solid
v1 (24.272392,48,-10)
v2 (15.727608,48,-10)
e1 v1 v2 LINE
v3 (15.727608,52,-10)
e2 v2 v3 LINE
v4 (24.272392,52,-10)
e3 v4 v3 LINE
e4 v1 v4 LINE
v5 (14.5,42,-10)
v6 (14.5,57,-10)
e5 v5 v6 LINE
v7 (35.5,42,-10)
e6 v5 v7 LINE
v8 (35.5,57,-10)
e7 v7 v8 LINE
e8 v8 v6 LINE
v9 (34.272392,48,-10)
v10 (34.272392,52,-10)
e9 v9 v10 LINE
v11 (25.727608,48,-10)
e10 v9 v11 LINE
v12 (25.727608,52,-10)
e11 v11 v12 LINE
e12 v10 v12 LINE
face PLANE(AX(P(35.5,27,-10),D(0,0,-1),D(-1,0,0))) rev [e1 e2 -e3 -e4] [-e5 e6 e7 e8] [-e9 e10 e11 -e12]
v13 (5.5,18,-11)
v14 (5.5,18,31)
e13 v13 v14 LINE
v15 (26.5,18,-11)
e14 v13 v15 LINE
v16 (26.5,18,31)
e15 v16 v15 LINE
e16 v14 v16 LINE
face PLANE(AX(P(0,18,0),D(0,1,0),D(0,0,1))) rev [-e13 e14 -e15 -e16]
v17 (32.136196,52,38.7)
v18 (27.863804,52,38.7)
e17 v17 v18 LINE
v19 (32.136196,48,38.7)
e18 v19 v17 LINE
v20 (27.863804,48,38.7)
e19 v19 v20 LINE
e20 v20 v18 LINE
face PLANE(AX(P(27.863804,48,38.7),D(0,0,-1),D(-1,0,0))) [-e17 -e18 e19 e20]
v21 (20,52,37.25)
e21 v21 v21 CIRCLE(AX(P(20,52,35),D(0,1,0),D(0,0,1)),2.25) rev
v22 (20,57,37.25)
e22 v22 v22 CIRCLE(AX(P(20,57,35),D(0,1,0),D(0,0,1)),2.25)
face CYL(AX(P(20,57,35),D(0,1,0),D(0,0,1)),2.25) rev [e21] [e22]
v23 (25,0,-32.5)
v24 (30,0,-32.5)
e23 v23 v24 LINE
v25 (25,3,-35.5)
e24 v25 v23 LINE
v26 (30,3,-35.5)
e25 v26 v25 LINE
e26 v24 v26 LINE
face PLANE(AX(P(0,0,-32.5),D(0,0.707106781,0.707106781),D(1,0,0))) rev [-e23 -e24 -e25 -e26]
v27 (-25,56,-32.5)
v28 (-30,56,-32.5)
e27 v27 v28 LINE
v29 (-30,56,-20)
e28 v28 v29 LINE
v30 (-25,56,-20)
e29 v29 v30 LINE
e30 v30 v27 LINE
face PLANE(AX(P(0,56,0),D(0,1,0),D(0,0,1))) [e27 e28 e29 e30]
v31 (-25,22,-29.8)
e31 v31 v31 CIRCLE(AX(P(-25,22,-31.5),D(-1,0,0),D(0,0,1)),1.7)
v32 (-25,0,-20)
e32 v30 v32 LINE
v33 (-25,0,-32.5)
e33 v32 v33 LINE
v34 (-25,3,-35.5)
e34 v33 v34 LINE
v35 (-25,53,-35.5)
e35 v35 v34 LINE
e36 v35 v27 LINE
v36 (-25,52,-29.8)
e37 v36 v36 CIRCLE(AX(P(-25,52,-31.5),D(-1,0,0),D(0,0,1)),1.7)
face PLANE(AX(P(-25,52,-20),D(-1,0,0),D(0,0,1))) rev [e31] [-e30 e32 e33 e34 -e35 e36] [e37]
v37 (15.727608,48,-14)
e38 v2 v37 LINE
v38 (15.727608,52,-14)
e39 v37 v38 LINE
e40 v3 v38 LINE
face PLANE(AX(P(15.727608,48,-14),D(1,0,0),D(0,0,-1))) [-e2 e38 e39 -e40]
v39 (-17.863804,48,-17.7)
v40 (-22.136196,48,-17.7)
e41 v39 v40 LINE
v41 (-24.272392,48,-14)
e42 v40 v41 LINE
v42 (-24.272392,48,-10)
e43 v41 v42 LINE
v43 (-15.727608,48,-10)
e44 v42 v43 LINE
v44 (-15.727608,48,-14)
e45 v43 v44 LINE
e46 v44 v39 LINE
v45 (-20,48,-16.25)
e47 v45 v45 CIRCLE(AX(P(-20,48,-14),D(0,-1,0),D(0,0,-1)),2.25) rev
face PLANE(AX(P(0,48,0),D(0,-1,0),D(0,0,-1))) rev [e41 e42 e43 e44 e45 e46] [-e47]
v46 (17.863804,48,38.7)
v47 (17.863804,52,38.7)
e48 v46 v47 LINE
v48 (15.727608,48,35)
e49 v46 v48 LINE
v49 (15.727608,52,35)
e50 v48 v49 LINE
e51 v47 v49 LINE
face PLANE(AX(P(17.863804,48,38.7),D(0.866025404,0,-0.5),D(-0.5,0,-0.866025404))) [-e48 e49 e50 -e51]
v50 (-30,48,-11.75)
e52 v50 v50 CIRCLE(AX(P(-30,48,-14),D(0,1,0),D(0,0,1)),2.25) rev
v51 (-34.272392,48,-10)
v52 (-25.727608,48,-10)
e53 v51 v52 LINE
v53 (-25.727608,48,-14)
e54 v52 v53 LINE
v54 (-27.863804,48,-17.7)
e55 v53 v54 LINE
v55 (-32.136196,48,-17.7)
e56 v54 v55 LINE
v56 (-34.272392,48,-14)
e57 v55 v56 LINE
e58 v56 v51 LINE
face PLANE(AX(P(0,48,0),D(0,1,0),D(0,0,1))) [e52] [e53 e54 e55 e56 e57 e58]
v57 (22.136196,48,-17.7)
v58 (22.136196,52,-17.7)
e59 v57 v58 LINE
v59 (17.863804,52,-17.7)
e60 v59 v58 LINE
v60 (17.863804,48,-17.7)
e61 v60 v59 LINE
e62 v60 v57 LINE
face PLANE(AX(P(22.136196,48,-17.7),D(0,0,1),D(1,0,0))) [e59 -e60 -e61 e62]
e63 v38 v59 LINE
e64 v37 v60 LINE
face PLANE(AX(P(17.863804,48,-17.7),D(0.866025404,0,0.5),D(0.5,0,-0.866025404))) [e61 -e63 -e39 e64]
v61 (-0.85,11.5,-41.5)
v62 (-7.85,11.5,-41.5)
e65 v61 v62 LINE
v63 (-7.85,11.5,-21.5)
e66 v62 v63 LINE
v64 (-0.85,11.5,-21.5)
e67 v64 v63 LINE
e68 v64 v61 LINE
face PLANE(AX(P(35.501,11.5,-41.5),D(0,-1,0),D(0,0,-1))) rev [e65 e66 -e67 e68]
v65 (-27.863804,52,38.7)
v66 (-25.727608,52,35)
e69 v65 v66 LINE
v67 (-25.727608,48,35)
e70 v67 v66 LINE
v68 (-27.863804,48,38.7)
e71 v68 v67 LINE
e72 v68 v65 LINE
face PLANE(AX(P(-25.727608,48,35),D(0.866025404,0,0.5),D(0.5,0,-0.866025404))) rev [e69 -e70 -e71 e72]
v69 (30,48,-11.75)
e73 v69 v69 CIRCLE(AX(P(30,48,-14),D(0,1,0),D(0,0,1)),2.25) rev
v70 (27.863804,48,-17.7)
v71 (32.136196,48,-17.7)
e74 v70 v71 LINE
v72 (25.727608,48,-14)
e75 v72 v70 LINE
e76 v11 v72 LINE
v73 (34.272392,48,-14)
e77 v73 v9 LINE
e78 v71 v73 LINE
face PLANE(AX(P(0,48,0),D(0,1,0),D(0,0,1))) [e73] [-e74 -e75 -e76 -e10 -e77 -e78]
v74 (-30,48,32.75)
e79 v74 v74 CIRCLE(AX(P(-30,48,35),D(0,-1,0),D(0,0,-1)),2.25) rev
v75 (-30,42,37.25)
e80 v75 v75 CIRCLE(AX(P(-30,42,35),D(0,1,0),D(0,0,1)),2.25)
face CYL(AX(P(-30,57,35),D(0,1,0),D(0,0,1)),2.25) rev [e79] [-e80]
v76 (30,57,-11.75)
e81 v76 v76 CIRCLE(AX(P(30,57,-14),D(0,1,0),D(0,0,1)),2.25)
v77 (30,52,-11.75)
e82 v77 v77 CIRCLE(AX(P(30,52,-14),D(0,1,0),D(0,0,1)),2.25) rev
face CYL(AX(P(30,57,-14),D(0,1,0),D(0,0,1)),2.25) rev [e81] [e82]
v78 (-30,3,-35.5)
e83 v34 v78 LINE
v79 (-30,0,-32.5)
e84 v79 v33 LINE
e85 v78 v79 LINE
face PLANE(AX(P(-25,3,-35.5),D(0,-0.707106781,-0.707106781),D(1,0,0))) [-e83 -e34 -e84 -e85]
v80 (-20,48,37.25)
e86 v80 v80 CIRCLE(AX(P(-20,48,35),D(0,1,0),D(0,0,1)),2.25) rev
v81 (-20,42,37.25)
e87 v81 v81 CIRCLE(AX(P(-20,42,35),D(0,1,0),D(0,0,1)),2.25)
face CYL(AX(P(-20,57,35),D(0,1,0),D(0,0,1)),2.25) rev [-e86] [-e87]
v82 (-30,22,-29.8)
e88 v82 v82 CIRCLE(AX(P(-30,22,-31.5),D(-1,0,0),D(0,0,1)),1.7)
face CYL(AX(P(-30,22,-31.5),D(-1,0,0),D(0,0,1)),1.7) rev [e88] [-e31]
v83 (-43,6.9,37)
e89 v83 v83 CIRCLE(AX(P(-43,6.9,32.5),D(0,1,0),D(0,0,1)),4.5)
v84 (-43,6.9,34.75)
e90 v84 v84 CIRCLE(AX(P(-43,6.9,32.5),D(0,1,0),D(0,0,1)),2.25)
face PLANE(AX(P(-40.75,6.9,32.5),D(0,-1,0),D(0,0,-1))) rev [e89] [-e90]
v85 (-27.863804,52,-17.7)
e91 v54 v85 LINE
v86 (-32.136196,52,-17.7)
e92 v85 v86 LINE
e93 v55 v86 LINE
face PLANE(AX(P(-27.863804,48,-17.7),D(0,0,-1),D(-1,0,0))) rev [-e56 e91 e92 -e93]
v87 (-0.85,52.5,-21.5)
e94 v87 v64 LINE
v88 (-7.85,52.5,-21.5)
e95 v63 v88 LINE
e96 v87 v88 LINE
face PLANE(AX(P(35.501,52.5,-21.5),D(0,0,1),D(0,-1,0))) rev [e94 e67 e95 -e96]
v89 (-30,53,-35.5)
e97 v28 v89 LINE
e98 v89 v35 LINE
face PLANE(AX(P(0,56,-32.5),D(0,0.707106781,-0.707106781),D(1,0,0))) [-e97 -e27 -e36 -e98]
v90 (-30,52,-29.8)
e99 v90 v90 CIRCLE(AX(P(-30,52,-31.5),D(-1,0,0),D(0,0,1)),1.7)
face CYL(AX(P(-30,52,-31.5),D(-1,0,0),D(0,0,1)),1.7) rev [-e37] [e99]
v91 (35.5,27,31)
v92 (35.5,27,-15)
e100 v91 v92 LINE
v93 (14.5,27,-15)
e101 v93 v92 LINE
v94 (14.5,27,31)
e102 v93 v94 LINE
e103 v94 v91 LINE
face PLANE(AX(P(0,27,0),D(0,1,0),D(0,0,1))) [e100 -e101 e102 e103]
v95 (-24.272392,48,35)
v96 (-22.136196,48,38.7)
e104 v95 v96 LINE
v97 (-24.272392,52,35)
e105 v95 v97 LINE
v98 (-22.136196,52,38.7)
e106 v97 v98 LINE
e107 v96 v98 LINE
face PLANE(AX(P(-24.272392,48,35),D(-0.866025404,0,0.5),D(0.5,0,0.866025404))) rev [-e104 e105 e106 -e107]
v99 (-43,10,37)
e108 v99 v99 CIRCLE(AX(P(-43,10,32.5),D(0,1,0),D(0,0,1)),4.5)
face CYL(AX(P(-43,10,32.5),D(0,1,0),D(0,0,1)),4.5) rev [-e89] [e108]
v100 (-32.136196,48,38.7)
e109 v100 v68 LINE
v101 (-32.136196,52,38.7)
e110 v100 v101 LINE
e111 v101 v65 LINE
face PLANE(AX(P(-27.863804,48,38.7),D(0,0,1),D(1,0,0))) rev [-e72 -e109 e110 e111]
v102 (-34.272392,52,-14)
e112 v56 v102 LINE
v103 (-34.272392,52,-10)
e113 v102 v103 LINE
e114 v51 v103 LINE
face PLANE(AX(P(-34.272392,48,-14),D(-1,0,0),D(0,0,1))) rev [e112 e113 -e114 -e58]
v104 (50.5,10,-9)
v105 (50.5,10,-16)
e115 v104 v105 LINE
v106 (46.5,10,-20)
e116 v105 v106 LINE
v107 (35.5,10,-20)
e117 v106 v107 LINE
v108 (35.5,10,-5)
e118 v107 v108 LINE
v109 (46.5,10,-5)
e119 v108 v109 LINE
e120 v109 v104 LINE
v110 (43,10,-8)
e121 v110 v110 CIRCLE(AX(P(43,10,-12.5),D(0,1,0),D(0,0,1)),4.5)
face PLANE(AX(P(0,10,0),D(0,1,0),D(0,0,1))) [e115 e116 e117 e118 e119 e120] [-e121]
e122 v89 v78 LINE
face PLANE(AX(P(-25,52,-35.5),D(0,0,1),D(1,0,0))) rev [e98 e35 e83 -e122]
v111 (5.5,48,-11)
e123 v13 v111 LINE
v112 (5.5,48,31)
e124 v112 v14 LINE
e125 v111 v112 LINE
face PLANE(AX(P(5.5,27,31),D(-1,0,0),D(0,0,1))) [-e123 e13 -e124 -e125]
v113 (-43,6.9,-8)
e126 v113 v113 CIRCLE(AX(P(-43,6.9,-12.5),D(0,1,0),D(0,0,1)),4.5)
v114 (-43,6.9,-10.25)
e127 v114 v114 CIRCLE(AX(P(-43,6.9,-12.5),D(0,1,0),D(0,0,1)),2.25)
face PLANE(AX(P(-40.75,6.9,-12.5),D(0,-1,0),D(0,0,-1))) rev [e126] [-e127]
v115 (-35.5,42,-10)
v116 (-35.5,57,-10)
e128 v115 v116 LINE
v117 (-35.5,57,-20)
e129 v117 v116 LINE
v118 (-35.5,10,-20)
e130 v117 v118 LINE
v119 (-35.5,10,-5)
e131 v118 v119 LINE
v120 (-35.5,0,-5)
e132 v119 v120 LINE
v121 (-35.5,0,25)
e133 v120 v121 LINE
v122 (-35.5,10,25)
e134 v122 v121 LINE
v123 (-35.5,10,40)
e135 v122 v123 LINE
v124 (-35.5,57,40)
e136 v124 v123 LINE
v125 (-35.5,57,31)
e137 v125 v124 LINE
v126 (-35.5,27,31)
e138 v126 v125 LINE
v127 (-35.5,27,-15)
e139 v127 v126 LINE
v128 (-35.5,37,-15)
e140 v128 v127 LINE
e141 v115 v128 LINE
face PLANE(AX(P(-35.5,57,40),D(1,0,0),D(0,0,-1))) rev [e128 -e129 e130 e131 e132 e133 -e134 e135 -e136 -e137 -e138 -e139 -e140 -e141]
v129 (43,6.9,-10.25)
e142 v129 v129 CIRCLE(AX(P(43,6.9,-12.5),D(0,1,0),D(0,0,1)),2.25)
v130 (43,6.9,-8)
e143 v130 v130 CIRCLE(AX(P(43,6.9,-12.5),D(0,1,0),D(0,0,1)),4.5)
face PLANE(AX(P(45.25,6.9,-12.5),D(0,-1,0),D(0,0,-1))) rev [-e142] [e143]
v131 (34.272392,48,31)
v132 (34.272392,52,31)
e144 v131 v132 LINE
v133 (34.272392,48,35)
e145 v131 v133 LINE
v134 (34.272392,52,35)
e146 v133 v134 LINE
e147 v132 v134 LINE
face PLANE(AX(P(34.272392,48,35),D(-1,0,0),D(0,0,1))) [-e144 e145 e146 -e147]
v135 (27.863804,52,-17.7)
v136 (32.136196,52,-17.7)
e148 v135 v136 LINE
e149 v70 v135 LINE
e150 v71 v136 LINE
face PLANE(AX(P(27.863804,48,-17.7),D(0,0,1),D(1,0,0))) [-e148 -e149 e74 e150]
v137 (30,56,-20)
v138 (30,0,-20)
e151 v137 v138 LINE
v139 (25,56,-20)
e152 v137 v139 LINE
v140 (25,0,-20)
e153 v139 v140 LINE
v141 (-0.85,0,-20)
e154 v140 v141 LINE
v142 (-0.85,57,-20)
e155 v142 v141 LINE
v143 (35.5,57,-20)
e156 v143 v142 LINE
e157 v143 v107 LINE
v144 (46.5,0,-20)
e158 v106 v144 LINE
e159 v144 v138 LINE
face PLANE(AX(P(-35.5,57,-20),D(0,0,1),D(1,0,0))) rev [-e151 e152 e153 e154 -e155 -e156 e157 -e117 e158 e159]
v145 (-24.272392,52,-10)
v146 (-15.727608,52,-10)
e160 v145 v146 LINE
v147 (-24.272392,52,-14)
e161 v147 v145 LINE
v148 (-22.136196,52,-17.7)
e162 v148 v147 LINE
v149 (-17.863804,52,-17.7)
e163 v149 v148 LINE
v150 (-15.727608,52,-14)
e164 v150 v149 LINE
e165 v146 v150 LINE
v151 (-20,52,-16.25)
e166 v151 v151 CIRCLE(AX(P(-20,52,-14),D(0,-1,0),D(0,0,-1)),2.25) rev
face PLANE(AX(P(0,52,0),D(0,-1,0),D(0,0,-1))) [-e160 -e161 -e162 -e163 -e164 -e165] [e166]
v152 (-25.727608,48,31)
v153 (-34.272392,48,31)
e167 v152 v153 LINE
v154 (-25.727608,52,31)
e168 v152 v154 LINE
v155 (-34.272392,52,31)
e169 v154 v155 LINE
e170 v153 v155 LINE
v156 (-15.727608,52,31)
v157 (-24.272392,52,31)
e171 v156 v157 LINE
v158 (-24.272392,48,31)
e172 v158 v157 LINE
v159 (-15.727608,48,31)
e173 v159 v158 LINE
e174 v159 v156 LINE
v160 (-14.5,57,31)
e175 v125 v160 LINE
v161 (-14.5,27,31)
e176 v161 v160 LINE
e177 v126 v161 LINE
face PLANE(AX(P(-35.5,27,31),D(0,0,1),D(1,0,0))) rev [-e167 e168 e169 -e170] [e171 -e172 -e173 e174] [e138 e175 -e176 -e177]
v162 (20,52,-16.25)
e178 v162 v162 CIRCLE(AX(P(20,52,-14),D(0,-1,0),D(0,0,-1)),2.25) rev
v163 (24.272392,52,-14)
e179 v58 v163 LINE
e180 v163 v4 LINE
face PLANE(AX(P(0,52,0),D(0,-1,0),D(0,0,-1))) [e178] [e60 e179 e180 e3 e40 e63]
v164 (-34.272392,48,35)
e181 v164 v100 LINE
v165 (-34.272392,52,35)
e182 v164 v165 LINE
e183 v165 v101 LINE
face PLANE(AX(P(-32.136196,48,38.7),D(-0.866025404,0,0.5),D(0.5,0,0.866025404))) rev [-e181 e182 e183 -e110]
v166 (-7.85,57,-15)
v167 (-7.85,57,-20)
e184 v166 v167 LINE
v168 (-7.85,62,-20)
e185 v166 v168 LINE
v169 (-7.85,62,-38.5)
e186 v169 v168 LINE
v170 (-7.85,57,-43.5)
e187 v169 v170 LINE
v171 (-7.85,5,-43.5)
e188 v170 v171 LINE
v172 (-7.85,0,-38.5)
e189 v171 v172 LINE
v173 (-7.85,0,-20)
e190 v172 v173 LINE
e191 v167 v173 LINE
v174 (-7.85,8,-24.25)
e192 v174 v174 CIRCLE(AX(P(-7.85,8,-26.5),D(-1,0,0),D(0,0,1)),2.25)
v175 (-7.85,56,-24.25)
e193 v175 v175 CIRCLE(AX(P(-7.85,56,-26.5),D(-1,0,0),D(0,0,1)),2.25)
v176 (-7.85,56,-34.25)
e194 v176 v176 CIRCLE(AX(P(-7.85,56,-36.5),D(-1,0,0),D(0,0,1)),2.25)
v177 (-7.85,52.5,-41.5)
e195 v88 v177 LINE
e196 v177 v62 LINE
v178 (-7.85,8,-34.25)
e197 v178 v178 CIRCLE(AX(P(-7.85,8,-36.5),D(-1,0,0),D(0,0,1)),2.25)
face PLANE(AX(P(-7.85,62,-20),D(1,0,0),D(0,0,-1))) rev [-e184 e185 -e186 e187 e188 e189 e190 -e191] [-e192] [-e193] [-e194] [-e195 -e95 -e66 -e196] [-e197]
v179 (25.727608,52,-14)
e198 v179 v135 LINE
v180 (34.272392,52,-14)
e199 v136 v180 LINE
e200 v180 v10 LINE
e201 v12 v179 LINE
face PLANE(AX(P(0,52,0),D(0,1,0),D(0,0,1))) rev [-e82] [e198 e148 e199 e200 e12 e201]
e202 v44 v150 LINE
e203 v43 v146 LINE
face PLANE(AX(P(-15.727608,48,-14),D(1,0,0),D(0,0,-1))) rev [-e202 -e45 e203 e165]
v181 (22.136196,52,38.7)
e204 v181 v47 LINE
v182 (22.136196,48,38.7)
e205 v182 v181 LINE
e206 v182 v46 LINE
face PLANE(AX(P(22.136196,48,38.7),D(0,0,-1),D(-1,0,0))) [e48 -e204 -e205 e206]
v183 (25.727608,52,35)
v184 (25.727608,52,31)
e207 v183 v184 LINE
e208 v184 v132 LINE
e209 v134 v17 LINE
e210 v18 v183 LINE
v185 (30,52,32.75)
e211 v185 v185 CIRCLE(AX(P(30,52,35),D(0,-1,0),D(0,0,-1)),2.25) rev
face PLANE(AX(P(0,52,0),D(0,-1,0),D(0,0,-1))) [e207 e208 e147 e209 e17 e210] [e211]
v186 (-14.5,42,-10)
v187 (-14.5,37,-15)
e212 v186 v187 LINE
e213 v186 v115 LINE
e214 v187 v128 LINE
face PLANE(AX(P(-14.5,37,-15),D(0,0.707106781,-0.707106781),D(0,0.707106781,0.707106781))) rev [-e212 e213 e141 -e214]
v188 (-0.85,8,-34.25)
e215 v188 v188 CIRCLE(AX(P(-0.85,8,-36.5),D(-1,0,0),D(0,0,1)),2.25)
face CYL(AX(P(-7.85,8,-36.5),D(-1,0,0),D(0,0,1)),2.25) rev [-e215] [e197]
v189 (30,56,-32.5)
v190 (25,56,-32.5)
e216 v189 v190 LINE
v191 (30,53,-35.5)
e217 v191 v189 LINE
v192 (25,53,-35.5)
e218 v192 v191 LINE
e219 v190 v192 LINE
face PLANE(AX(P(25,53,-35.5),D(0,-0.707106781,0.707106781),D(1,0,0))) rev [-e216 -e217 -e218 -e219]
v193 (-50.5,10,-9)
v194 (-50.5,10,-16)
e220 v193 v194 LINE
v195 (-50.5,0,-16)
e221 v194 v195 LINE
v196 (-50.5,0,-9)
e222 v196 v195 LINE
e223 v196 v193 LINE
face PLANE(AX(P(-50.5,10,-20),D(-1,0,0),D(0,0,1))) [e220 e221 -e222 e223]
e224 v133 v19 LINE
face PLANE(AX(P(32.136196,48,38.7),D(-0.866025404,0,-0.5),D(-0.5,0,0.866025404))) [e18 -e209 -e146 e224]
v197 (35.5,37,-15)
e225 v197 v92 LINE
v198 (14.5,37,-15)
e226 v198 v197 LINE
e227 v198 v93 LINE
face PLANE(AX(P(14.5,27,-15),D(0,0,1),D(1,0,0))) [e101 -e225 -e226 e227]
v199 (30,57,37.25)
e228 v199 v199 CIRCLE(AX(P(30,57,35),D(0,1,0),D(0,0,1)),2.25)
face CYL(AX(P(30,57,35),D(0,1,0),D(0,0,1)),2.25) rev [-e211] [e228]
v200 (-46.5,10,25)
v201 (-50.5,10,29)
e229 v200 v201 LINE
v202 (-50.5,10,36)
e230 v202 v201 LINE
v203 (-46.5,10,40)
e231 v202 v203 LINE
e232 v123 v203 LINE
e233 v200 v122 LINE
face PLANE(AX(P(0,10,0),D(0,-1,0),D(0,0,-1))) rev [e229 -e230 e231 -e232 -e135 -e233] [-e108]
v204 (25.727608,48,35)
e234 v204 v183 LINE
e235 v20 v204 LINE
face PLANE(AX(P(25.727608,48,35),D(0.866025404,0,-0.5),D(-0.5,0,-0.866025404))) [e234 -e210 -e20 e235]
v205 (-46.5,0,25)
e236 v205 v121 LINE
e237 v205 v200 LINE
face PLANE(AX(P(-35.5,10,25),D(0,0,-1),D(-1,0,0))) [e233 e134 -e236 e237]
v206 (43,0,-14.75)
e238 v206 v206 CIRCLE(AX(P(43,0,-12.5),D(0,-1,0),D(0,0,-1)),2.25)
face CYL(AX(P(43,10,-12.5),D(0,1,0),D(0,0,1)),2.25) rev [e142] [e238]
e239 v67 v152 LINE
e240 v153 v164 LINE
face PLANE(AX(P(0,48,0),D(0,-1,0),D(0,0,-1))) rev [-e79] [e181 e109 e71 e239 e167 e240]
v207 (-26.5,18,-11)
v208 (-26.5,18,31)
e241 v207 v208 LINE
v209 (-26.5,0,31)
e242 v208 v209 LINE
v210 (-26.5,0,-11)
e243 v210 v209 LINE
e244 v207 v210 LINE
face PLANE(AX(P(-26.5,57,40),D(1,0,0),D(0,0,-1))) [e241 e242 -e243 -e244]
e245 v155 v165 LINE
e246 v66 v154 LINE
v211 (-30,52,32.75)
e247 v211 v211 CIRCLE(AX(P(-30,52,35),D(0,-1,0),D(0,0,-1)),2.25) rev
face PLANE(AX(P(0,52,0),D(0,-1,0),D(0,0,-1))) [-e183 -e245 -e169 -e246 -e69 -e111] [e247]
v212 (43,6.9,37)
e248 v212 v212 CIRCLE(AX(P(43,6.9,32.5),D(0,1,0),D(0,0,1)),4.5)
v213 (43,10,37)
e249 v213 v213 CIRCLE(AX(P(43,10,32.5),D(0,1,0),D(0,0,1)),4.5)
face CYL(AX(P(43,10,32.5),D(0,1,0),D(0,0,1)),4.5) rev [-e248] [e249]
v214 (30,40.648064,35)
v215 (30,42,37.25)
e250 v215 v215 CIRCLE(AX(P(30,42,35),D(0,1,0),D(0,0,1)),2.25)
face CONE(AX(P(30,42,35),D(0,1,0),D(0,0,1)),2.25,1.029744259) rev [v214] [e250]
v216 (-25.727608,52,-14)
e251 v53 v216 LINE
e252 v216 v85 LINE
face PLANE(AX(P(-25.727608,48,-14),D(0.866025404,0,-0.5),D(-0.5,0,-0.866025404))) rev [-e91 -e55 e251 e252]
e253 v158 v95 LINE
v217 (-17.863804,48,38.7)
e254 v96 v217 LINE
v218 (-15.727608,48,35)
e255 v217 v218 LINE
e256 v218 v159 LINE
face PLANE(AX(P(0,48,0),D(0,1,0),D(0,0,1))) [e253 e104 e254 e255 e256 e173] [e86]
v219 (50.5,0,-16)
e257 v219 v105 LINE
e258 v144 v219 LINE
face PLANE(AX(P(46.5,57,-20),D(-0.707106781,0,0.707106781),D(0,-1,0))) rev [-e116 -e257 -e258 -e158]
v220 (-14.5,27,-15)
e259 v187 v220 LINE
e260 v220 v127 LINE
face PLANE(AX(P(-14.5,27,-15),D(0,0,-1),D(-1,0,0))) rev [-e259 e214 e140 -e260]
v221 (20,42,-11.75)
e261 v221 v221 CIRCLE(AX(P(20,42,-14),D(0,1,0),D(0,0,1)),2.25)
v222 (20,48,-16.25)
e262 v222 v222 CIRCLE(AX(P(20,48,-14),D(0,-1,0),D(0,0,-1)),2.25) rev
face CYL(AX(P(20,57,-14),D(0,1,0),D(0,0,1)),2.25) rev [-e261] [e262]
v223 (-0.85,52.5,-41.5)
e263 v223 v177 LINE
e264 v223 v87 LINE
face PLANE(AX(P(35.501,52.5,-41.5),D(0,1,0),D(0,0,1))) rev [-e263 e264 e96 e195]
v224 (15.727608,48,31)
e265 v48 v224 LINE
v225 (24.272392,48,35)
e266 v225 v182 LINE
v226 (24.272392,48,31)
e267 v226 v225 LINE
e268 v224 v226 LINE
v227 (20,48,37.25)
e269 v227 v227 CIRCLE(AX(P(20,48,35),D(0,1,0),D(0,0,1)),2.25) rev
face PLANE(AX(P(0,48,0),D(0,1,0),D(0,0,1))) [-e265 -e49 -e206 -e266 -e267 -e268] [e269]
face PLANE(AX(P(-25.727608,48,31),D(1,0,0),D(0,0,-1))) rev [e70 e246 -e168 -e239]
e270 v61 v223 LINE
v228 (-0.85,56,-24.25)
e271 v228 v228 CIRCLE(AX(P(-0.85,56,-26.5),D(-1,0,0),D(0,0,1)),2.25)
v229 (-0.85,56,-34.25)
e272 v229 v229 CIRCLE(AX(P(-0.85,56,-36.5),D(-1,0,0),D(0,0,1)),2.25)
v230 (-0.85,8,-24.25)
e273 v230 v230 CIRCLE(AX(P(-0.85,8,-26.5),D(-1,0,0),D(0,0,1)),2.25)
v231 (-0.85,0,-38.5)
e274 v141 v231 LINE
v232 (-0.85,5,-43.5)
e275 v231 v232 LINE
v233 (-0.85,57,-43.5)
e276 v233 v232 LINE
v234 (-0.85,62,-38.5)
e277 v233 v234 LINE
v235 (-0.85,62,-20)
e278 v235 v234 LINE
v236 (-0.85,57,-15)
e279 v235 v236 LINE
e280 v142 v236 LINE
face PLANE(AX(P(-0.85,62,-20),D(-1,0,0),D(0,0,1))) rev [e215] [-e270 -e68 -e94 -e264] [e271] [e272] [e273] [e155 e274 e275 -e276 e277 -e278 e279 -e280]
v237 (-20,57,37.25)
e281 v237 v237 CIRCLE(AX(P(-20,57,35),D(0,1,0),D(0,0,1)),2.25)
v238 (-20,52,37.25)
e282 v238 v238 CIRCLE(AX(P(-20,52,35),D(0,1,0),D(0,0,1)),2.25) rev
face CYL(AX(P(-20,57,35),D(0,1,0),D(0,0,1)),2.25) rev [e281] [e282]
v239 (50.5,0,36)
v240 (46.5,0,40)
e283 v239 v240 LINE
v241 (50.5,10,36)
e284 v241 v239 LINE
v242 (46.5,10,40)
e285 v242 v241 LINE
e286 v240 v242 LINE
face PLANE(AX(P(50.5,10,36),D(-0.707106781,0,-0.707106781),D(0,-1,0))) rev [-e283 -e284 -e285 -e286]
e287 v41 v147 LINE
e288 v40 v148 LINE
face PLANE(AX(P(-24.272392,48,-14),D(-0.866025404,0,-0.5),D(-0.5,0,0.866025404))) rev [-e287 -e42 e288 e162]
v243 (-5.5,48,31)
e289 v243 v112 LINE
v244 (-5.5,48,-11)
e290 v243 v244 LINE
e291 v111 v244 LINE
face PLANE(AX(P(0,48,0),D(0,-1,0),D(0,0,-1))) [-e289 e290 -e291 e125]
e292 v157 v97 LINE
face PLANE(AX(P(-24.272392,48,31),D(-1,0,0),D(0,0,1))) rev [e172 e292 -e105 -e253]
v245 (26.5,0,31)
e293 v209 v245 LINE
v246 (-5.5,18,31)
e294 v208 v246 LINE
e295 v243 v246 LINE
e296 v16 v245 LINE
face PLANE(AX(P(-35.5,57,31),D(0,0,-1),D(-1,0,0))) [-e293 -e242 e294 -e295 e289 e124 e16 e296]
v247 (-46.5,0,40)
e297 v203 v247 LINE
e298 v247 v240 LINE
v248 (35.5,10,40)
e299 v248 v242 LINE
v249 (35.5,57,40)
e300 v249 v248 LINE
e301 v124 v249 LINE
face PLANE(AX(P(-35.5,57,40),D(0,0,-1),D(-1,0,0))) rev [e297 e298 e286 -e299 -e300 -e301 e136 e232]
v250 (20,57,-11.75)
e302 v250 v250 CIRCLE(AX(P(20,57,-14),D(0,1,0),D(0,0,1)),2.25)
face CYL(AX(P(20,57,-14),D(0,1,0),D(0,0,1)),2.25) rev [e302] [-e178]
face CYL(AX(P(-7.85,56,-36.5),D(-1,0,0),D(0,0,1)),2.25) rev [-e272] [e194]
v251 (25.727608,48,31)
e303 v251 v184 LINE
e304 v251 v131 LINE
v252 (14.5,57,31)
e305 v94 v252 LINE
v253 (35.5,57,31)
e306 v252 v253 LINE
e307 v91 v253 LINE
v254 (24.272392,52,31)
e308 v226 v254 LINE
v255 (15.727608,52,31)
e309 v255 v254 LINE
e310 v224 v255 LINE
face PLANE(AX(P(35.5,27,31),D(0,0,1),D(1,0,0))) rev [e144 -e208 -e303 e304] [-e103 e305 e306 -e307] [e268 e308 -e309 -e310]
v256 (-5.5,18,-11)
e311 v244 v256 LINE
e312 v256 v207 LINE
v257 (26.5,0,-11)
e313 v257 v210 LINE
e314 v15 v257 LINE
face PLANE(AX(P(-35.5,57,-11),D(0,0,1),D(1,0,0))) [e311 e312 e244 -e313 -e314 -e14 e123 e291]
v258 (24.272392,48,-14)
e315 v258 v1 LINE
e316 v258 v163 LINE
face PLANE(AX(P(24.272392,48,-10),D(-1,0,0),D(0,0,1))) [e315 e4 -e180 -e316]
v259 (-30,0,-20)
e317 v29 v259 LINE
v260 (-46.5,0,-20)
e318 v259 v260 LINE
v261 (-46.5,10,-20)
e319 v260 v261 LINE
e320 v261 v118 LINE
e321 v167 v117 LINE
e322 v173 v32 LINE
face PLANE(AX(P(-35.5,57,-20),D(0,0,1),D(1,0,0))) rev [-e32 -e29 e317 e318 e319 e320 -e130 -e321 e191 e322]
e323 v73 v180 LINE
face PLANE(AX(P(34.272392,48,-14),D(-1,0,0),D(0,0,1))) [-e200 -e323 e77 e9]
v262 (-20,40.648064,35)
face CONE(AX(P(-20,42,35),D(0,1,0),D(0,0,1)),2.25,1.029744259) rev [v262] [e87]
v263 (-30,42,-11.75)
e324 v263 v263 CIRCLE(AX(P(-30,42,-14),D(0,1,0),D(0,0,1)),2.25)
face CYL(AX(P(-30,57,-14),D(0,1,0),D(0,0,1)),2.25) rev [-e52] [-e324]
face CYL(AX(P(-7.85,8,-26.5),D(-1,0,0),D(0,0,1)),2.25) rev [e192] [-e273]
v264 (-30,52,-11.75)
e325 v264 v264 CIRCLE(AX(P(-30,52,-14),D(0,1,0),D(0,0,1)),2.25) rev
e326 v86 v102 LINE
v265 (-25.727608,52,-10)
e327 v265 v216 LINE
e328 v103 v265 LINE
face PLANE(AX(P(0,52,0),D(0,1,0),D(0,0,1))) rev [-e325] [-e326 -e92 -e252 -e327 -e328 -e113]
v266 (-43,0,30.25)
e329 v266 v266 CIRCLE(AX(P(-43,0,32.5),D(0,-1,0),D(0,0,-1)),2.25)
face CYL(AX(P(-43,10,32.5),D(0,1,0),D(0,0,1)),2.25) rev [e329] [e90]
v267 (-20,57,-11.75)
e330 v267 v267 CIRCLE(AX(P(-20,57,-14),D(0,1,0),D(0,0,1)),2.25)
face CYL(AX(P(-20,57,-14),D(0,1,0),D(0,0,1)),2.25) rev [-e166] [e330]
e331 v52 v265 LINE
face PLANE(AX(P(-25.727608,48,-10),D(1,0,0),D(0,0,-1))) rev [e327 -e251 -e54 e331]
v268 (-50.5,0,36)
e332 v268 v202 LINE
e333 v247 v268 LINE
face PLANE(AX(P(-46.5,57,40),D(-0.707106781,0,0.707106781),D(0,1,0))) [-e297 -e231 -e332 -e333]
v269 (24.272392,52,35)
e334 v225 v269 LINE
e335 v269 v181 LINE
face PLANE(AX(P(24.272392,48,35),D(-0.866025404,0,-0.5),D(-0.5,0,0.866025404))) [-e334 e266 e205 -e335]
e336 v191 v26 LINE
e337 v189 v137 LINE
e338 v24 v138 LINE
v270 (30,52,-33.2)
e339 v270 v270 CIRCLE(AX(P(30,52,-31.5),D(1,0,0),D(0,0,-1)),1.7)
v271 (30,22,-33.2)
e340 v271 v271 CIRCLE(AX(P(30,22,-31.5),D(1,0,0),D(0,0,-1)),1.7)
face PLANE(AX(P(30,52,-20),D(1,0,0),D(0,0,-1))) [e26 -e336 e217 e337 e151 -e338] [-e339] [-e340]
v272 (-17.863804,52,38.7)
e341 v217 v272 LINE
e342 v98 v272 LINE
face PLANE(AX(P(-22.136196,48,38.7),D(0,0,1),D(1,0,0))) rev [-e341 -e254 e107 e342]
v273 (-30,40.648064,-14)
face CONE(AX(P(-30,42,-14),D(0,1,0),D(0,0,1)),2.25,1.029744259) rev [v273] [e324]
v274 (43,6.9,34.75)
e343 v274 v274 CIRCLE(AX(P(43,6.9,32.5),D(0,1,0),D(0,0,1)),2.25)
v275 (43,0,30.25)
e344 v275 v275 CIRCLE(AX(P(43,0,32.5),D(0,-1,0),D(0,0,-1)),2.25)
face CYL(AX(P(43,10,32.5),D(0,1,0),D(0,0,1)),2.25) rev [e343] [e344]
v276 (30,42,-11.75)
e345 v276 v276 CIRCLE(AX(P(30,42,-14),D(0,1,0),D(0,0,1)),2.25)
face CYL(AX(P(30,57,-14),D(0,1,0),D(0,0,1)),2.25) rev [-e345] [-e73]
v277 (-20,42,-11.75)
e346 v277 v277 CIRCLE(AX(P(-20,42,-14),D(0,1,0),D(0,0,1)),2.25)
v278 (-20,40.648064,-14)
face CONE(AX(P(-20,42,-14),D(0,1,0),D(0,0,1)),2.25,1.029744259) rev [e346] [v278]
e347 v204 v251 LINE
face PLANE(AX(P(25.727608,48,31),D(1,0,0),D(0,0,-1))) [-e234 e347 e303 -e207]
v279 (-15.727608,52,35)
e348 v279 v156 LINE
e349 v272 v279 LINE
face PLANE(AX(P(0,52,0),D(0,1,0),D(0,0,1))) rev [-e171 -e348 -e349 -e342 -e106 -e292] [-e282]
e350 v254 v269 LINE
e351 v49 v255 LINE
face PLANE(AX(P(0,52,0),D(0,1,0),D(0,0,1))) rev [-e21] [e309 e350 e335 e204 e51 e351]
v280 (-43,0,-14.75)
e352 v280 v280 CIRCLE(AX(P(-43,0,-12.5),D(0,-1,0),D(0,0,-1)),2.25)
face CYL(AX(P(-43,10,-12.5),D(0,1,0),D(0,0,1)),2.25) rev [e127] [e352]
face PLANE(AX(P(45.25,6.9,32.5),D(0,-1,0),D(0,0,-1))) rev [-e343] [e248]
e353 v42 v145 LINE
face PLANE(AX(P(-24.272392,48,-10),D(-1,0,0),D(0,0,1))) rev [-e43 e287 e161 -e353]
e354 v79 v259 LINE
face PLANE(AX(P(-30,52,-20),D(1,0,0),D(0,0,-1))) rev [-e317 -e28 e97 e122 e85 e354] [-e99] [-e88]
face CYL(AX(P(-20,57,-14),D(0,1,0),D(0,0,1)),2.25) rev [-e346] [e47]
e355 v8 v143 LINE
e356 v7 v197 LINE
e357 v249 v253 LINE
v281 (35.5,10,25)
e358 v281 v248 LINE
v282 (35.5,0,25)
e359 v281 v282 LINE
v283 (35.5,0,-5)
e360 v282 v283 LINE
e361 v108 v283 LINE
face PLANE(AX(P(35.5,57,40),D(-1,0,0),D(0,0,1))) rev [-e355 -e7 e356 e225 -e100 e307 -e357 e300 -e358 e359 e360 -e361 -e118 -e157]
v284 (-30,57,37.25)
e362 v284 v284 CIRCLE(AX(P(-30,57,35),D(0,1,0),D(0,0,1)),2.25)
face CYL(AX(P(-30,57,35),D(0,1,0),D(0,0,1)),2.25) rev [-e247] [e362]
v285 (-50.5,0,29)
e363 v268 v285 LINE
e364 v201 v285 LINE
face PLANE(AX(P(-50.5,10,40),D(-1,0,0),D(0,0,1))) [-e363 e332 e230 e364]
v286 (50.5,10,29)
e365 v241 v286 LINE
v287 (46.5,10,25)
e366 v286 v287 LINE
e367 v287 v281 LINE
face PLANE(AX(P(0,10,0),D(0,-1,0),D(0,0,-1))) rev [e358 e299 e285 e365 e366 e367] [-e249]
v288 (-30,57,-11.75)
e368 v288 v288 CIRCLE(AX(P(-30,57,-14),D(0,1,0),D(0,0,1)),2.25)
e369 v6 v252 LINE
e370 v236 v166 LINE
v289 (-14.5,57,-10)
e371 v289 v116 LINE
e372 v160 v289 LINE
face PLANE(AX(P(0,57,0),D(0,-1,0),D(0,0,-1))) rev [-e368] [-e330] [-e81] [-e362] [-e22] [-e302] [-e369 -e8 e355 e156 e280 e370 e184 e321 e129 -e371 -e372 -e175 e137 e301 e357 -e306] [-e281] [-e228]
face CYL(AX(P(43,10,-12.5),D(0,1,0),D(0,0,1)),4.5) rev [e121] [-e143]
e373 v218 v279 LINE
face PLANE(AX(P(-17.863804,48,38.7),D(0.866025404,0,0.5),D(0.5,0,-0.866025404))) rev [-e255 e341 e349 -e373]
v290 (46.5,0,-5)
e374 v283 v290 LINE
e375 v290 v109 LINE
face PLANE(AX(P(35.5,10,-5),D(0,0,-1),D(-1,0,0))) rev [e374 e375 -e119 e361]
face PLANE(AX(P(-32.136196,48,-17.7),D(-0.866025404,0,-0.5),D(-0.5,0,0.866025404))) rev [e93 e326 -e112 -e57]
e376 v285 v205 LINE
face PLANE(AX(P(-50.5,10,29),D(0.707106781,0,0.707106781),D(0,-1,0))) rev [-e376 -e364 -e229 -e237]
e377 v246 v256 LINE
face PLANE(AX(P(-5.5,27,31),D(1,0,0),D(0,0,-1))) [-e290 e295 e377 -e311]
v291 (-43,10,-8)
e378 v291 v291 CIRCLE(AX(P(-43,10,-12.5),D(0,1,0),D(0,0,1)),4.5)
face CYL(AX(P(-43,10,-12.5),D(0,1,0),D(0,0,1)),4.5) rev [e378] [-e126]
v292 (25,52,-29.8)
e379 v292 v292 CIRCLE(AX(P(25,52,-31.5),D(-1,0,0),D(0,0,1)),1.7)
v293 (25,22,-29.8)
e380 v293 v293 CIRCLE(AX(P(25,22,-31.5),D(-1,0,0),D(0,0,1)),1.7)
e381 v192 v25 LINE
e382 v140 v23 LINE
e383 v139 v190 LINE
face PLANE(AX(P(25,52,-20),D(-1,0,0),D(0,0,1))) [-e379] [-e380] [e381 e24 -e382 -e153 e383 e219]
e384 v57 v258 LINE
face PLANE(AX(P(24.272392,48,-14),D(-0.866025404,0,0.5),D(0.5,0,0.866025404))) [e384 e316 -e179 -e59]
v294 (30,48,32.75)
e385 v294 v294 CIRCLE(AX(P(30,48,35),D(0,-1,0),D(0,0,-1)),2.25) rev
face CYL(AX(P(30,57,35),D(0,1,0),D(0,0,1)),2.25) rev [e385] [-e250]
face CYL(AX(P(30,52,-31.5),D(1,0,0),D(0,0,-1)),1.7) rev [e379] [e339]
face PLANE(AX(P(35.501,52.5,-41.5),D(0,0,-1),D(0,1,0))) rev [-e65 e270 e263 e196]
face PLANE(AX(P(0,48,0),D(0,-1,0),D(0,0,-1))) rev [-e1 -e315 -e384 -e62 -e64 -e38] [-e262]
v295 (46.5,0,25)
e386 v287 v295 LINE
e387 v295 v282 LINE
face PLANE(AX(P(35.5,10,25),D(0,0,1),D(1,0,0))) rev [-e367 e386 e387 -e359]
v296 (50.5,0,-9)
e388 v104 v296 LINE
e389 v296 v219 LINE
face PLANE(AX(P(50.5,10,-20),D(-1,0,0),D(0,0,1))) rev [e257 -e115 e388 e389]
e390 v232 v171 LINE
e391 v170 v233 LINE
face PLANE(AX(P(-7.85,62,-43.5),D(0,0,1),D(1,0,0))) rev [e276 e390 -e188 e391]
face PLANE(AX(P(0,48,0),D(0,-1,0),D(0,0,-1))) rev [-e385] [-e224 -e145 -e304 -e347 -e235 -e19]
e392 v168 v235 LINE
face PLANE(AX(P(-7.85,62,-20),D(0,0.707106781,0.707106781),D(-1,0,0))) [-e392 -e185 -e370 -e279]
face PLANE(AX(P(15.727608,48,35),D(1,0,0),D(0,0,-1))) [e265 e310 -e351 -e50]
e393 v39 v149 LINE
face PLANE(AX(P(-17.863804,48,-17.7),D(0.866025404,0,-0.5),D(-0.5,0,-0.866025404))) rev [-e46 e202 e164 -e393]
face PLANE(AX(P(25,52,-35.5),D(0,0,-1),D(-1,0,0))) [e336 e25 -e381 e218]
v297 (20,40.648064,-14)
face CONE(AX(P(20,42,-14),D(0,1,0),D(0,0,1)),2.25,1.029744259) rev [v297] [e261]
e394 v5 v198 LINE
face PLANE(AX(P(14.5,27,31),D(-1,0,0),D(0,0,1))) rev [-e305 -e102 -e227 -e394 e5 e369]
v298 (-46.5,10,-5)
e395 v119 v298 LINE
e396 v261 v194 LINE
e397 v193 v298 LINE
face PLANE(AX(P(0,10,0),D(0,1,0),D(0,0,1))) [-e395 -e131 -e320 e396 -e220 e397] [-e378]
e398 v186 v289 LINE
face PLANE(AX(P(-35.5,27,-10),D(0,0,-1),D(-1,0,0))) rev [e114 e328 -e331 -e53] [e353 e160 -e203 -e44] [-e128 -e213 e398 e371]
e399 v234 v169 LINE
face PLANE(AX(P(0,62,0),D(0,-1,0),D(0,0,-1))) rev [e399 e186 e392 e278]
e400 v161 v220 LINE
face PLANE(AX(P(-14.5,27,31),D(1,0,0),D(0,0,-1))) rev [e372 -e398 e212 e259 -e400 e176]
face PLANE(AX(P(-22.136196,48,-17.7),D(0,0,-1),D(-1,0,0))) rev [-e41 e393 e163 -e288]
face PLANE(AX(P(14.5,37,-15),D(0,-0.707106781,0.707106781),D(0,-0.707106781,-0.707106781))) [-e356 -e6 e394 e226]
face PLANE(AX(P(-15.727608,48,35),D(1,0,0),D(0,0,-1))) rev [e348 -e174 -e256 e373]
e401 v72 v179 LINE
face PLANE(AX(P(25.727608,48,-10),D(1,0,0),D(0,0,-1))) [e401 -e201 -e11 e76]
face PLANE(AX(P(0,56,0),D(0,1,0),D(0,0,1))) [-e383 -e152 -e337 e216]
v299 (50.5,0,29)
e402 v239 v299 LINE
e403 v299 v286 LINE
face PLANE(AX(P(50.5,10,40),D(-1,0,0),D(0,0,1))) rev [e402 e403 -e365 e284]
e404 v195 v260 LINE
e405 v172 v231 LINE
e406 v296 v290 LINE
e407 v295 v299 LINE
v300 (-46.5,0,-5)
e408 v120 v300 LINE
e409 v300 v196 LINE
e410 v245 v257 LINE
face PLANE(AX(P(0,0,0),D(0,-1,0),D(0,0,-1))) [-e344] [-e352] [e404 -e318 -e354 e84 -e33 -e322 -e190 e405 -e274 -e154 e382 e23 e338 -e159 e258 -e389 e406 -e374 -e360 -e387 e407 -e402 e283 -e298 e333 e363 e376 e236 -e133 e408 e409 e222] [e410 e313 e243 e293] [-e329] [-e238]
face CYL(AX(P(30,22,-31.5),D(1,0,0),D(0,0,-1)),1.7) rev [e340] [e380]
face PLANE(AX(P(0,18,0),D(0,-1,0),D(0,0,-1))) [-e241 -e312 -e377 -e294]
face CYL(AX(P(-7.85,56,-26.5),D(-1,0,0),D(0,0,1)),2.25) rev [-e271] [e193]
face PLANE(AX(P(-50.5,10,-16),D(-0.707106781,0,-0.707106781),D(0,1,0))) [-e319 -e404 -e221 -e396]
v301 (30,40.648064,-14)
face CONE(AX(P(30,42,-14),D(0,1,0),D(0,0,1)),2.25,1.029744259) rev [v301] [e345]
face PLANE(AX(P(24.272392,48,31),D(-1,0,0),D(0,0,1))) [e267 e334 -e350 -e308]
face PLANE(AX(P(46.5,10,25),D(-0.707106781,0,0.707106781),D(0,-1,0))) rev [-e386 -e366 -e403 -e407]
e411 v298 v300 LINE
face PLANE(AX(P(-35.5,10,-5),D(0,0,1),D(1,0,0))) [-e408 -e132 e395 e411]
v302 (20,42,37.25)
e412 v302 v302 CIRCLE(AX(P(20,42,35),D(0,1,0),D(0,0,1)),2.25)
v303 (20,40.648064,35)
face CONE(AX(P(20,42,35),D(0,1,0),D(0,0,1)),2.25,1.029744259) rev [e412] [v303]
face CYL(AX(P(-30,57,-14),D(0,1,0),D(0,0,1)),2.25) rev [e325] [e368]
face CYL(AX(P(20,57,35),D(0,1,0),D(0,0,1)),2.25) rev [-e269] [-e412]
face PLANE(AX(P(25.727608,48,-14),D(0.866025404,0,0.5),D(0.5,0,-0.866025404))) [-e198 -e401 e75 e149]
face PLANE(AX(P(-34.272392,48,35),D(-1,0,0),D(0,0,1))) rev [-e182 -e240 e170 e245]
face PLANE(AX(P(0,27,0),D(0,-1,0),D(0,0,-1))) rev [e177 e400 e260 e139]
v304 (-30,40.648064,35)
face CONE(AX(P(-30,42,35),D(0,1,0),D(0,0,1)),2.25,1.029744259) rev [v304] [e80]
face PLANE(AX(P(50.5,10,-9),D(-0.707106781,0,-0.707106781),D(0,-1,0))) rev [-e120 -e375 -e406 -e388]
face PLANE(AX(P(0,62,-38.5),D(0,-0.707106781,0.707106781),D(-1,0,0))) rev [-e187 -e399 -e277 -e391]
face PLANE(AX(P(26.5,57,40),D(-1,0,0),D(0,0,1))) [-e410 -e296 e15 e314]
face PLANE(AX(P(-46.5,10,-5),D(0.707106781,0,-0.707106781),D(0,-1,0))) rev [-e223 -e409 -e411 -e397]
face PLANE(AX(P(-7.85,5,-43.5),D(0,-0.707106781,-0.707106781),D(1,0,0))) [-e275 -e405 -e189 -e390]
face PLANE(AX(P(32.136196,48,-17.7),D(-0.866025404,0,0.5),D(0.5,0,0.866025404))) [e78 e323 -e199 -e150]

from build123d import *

# Parameters (mm, degrees)
SKETCH3_W                                = 71
SKETCH3_H                                = 60
BOSS_EXTRUDE2_DEPTH                      = 57
SKETCH4_W                                = 5
SKETCH4_H                                = 15.5
BOSS_EXTRUDE4_DEPTH                      = 52
SKETCH8_W                                = 5
SKETCH8_H                                = 15.5
BOSS_EXTRUDE5_DEPTH                      = 4
M3_CLEARANCE_HOLE1_D                     = 3.4
M3_CLEARANCE_HOLE1_DEPTH                 = 60
CHAMFER1_SIZE                            = 3
CHAMFER1_OF_MIRROR1_SIZE                 = 3
SKETCH12_W                               = 7
SKETCH12_H                               = 23.5
BOSS_EXTRUDE6_DEPTH                      = 62
CUT_EXTRUDE1_REACH                       = 89.267
SKETCH13_W                               = 20
SKETCH13_H                               = 41
M4_CLEARANCE_HOLE3_D                     = 4.5
M4_CLEARANCE_HOLE3_DEPTH                 = 7
SKETCH17_W                               = 21
SKETCH17_H                               = 41
CUT_EXTRUDE2_DEPTH                       = 30
CUT_EXTRUDE4_DEPTH                       = 21
M4_CLEARANCE_HOLE4_AT_2_COUNT            = 2
M4_CLEARANCE_HOLE4_AT_2_PITCH            = 10
M4_CLEARANCE_HOLE4_AT_3_COUNT            = 2
M4_CLEARANCE_HOLE4_AT_3_PITCH            = 50.009999
M4_CLEARANCE_HOLE4_AT_4_COUNT            = 2
M4_CLEARANCE_HOLE4_AT_4_PITCH            = 49
CUT_EXTRUDE3_DEPTH                       = 4
SHELL1_START                             = -11
SHELL1_DEPTH                             = 42
SKETCH22_W                               = 15
SKETCH22_H                               = 15
BOSS_EXTRUDE7_DEPTH                      = 10
CBORE_FOR_M4_PAN_HEAD_SCREW1_D           = 4.5
CBORE_FOR_M4_PAN_HEAD_SCREW1_CBORE_D     = 9
CBORE_FOR_M4_PAN_HEAD_SCREW1_CBORE_DEPTH = 3.1
CHAMFER2_SIZE                            = 4
CHAMFER2_OF_MIRROR3_SIZE                 = 4
CHAMFER3_SIZE                            = 5
CHAMFER4_SIZE                            = 5


# Read off the part's stored shape, not the designer's step: Shell1
with BuildPart() as part:
    # Sketch3 → Boss-Extrude2 (new body)
    with BuildSketch(Plane(origin=(0, 0, 0), x_dir=(1, 0, 0), z_dir=(0, 1, 0))):
        with Locations((0, -10)):
            Rectangle(SKETCH3_W, SKETCH3_H)
    extrude(amount=BOSS_EXTRUDE2_DEPTH)

    # Sketch4 → Boss-Extrude4 (add)
    with BuildSketch(Plane(origin=(0, 0, 0), x_dir=(1, 0, 0), z_dir=(0, 1, 0))):
        with Locations((-27.5, 27.75)):
            Rectangle(SKETCH4_W, SKETCH4_H)
    boss_extrude4 = extrude(amount=BOSS_EXTRUDE4_DEPTH)

    # Sketch8 → Boss-Extrude5 (add)
    with BuildSketch(Plane(origin=(0, 52, 0), x_dir=(1, 0, 0), z_dir=(0, 1, 0))):
        with Locations((-27.5, 27.75)):
            Rectangle(SKETCH8_W, SKETCH8_H)
    boss_extrude5 = extrude(amount=BOSS_EXTRUDE5_DEPTH)

    # M3 Clearance Hole1
    with Locations(Plane.ZY.offset(30)):
        with Locations((-31.5, 22), (-31.5, 52)):
            m3_clearance_hole1 = Hole(M3_CLEARANCE_HOLE1_D / 2, depth=M3_CLEARANCE_HOLE1_DEPTH)

    # Chamfer1
    chamfer1_edges = [part.edges().sort_by_distance(p)[0] for p in [
        (-27.5, 0, -35.5),
        (-27.5, 56, -35.5),
    ]]
    chamfer(chamfer1_edges, length=CHAMFER1_SIZE)

    # Mirror1: Boss-Extrude4, Boss-Extrude5, M3 Clearance Hole1 across plane
    add(boss_extrude4.mirror(Plane(origin=(0, 0, 0), x_dir=(0, 0, 1), z_dir=(1, 0, 0))))
    add(boss_extrude5.mirror(Plane(origin=(0, 0, 0), x_dir=(0, 0, 1), z_dir=(1, 0, 0))))
    add(m3_clearance_hole1.mirror(Plane(origin=(0, 0, 0), x_dir=(0, 0, 1), z_dir=(1, 0, 0))), mode=Mode.SUBTRACT)

    # Chamfer1 of Mirror1
    chamfer1_of_mirror1_edges = [part.edges().sort_by_distance(p)[0] for p in [
        (27.5, 0, -35.5),
        (27.5, 56, -35.5),
    ]]
    chamfer(chamfer1_of_mirror1_edges, length=CHAMFER1_OF_MIRROR1_SIZE)

    # Sketch12 → Boss-Extrude6 (add)
    with BuildSketch(Plane(origin=(0, 0, 0), x_dir=(1, 0, 0), z_dir=(0, 1, 0))):
        with Locations((-4.35, 31.75)):
            Rectangle(SKETCH12_W, SKETCH12_H)
    extrude(amount=BOSS_EXTRUDE6_DEPTH)

    # Sketch13 → Cut-Extrude1 (cut, up to next)
    with BuildSketch(Plane.ZY.offset(7.85), mode=Mode.PRIVATE) as cut_extrude1_sk1:
        with Locations((-31.5, 32)):
            Rectangle(SKETCH13_W, SKETCH13_H)
    cut_extrude1_tool1 = extrude(cut_extrude1_sk1.sketch, amount=-CUT_EXTRUDE1_REACH, mode=Mode.PRIVATE) & part.part
    add(cut_extrude1_tool1.solids().sort_by_distance((-7.85, 32, -31.5))[0], mode=Mode.SUBTRACT)

    # M4 Clearance Hole3
    with Locations(Plane.ZY.offset(7.85)):
        with Locations((-36.5, 8), (-26.5, 8), (-36.5, 56), (-26.5, 56)):
            Hole(M4_CLEARANCE_HOLE3_D / 2, depth=M4_CLEARANCE_HOLE3_DEPTH)

    # Sketch17 → Cut-Extrude2 (cut)
    with BuildSketch(Plane(origin=(0, 57, 0), x_dir=(1, 0, 0), z_dir=(0, 1, 0))):
        with Locations((-25, -10.5)):
            Rectangle(SKETCH17_W, SKETCH17_H)
        with Locations((25, -10.5)):
            Rectangle(SKETCH17_W, SKETCH17_H)
    extrude(amount=-CUT_EXTRUDE2_DEPTH, mode=Mode.SUBTRACT)

    # Sketch21 → Cut-Extrude4 (cut)
    with BuildSketch(Plane.ZY.offset(35.5)):
        Polygon((-10, 27), (-15, 27), (-15, 37), (-10, 42), align=None)
    cut_extrude4 = extrude(amount=-CUT_EXTRUDE4_DEPTH, mode=Mode.SUBTRACT)

    # Sketch18 → M4 Clearance Hole4 (revolve, cut)
    with BuildSketch(Plane(origin=(-30, 57, -14), x_dir=(0, 0, 1), z_dir=(1, 0, 0))):
        Polygon((0, 0), (0, 16.351936393), (2.25, 15), (2.25, 0), align=None)
    m4_clearance_hole4 = revolve(axis=Axis((-30, 63.35, -14), (0, -1, 0)), mode=Mode.SUBTRACT)

    # M4 Clearance Hole4 at 2: M4 Clearance Hole4 ×2
    with Locations(*[(i * M4_CLEARANCE_HOLE4_AT_2_PITCH, 0, 0) for i in range(1, M4_CLEARANCE_HOLE4_AT_2_COUNT)]):
        add(m4_clearance_hole4, mode=Mode.SUBTRACT)

    # M4 Clearance Hole4 at 3: M4 Clearance Hole4 ×2
    with Locations(*[Vector(0.19996001199600155, 0, 0.9798040587804069) * (i * M4_CLEARANCE_HOLE4_AT_3_PITCH) for i in range(1, M4_CLEARANCE_HOLE4_AT_3_COUNT)]):
        add(m4_clearance_hole4, mode=Mode.SUBTRACT)

    # M4 Clearance Hole4 at 4: M4 Clearance Hole4 ×2
    with Locations(*[(0, 0, i * M4_CLEARANCE_HOLE4_AT_4_PITCH) for i in range(1, M4_CLEARANCE_HOLE4_AT_4_COUNT)]):
        add(m4_clearance_hole4, mode=Mode.SUBTRACT)

    # Sketch20 → Cut-Extrude3 (cut)
    with BuildSketch(Plane(origin=(0, 52, 0), x_dir=(1, 0, 0), z_dir=(0, 1, 0))):
        Polygon((-34.272391992, 14), (-34.272391992, 10), (-25.727608008, 10), (-25.727608008, 14), (-27.863804004, 17.7), (-32.136195996, 17.7), align=None)
        Polygon((-24.272391992, 10), (-24.272391992, 14), (-22.136195996, 17.7), (-17.863804004, 17.7), (-15.727608008, 14), (-15.727608008, 10), align=None)
        Polygon((-15.727608008, -35), (-15.727608008, -31), (-24.272391992, -31), (-24.272391992, -35), (-22.136195996, -38.7), (-17.863804004, -38.7), align=None)
        Polygon((-25.727608008, -31), (-25.727608008, -35), (-27.863804004, -38.7), (-32.136195996, -38.7), (-34.272391992, -35), (-34.272391992, -31), align=None)
    cut_extrude3 = extrude(amount=-CUT_EXTRUDE3_DEPTH, mode=Mode.SUBTRACT)

    # Mirror2: Cut-Extrude4, M4 Clearance Hole4, Cut-Extrude3 across plane
    add(cut_extrude4.mirror(Plane(origin=(0, 0, 0), x_dir=(0, 0, 1), z_dir=(1, 0, 0))), mode=Mode.SUBTRACT)
    add(m4_clearance_hole4.mirror(Plane(origin=(0, 0, 0), x_dir=(0, 0, 1), z_dir=(1, 0, 0))), mode=Mode.SUBTRACT)
    add(cut_extrude3.mirror(Plane(origin=(0, 0, 0), x_dir=(0, 0, 1), z_dir=(1, 0, 0))), mode=Mode.SUBTRACT)

    # Mirror2 copy 1 sketch → Mirror2 copy 1 (revolve, cut)
    with BuildSketch(Plane(origin=(20, 57, -14), x_dir=(0, 0, 1), z_dir=(-1, 0, 0))):
        Polygon((0, 0), (0, -16.351936393), (2.25, -15), (2.25, 0), align=None)
    revolve(axis=Axis((20, 63.35, -14), (0, 1, 0)), mode=Mode.SUBTRACT)

    # Mirror2 copy 2 sketch → Mirror2 copy 2 (revolve, cut)
    with BuildSketch(Plane(origin=(20, 57, 35), x_dir=(0, 0, 1), z_dir=(-1, 0, 0))):
        Polygon((0, 0), (0, -16.351936393), (2.25, -15), (2.25, 0), align=None)
    revolve(axis=Axis((20, 63.35, 35), (0, 1, 0)), mode=Mode.SUBTRACT)

    # Mirror2 copy 3 sketch → Mirror2 copy 3 (revolve, cut)
    with BuildSketch(Plane(origin=(30, 57, 35), x_dir=(0, 0, 1), z_dir=(-1, 0, 0))):
        Polygon((0, 0), (0, -16.351936393), (2.25, -15), (2.25, 0), align=None)
    revolve(axis=Axis((30, 63.35, 35), (0, 1, 0)), mode=Mode.SUBTRACT)

    # Shell1 outline → Shell1 (cut)
    with BuildSketch(Plane.XY.offset(SHELL1_START)):
        Polygon((-5.5, 18), (-26.5, 18), (-26.5, 0), (26.5, 0), (26.5, 18), (5.5, 18), (5.5, 48), (-5.5, 48), align=None)
    extrude(amount=SHELL1_DEPTH, mode=Mode.SUBTRACT)

    # Sketch22 → Boss-Extrude7 (add)
    with BuildSketch(Plane(origin=(0, 0, 0), x_dir=(1, 0, 0), z_dir=(0, 1, 0))):
        with Locations((43, 12.5)):
            Rectangle(SKETCH22_W, SKETCH22_H)
        with Locations((43, -32.5)):
            Rectangle(SKETCH22_W, SKETCH22_H)
    boss_extrude7 = extrude(amount=BOSS_EXTRUDE7_DEPTH)

    # CBORE for M4 Pan Head Screw1 (through all)
    with Locations(Plane(origin=(0, 10, 0), x_dir=(1, 0, 0), z_dir=(0, 1, 0))):
        with Locations((43, 12.5), (43, -32.5)):
            cbore_for_m4_pan_head_screw1 = CounterBoreHole(CBORE_FOR_M4_PAN_HEAD_SCREW1_D / 2, CBORE_FOR_M4_PAN_HEAD_SCREW1_CBORE_D / 2, CBORE_FOR_M4_PAN_HEAD_SCREW1_CBORE_DEPTH)

    # Chamfer2
    chamfer2_edges = [part.edges().sort_by_distance(p)[0] for p in [
        (50.5, 5, 40),
        (50.5, 5, 25),
        (50.5, 5, -5),
        (50.5, 5, -20),
    ]]
    chamfer(chamfer2_edges, length=CHAMFER2_SIZE)

    # Mirror3: Boss-Extrude7, CBORE for M4 Pan Head Screw1 across plane
    add(boss_extrude7.mirror(Plane(origin=(0, 0, 0), x_dir=(0, 0, 1), z_dir=(1, 0, 0))))
    add(cbore_for_m4_pan_head_screw1.mirror(Plane(origin=(0, 0, 0), x_dir=(0, 0, 1), z_dir=(1, 0, 0))), mode=Mode.SUBTRACT)

    # Chamfer2 of Mirror3
    chamfer2_of_mirror3_edges = [part.edges().sort_by_distance(p)[0] for p in [
        (-50.5, 5, 40),
        (-50.5, 5, 25),
        (-50.5, 5, -5),
        (-50.5, 5, -20),
    ]]
    chamfer(chamfer2_of_mirror3_edges, length=CHAMFER2_OF_MIRROR3_SIZE)

    # Chamfer3
    chamfer3_edges = [part.edges().sort_by_distance(p)[0] for p in [
        (-4.35, 57, -20),
    ]]
    chamfer(chamfer3_edges, length=CHAMFER3_SIZE - 0.0001)  # a hair under: the kernel refuses the full size

    # Chamfer4
    chamfer4_edges = [part.edges().sort_by_distance(p)[0] for p in [
        (-4.35, 0, -43.5),
        (-4.35, 62, -43.5),
    ]]
    chamfer(chamfer4_edges, length=CHAMFER4_SIZE)


solid = part.part
